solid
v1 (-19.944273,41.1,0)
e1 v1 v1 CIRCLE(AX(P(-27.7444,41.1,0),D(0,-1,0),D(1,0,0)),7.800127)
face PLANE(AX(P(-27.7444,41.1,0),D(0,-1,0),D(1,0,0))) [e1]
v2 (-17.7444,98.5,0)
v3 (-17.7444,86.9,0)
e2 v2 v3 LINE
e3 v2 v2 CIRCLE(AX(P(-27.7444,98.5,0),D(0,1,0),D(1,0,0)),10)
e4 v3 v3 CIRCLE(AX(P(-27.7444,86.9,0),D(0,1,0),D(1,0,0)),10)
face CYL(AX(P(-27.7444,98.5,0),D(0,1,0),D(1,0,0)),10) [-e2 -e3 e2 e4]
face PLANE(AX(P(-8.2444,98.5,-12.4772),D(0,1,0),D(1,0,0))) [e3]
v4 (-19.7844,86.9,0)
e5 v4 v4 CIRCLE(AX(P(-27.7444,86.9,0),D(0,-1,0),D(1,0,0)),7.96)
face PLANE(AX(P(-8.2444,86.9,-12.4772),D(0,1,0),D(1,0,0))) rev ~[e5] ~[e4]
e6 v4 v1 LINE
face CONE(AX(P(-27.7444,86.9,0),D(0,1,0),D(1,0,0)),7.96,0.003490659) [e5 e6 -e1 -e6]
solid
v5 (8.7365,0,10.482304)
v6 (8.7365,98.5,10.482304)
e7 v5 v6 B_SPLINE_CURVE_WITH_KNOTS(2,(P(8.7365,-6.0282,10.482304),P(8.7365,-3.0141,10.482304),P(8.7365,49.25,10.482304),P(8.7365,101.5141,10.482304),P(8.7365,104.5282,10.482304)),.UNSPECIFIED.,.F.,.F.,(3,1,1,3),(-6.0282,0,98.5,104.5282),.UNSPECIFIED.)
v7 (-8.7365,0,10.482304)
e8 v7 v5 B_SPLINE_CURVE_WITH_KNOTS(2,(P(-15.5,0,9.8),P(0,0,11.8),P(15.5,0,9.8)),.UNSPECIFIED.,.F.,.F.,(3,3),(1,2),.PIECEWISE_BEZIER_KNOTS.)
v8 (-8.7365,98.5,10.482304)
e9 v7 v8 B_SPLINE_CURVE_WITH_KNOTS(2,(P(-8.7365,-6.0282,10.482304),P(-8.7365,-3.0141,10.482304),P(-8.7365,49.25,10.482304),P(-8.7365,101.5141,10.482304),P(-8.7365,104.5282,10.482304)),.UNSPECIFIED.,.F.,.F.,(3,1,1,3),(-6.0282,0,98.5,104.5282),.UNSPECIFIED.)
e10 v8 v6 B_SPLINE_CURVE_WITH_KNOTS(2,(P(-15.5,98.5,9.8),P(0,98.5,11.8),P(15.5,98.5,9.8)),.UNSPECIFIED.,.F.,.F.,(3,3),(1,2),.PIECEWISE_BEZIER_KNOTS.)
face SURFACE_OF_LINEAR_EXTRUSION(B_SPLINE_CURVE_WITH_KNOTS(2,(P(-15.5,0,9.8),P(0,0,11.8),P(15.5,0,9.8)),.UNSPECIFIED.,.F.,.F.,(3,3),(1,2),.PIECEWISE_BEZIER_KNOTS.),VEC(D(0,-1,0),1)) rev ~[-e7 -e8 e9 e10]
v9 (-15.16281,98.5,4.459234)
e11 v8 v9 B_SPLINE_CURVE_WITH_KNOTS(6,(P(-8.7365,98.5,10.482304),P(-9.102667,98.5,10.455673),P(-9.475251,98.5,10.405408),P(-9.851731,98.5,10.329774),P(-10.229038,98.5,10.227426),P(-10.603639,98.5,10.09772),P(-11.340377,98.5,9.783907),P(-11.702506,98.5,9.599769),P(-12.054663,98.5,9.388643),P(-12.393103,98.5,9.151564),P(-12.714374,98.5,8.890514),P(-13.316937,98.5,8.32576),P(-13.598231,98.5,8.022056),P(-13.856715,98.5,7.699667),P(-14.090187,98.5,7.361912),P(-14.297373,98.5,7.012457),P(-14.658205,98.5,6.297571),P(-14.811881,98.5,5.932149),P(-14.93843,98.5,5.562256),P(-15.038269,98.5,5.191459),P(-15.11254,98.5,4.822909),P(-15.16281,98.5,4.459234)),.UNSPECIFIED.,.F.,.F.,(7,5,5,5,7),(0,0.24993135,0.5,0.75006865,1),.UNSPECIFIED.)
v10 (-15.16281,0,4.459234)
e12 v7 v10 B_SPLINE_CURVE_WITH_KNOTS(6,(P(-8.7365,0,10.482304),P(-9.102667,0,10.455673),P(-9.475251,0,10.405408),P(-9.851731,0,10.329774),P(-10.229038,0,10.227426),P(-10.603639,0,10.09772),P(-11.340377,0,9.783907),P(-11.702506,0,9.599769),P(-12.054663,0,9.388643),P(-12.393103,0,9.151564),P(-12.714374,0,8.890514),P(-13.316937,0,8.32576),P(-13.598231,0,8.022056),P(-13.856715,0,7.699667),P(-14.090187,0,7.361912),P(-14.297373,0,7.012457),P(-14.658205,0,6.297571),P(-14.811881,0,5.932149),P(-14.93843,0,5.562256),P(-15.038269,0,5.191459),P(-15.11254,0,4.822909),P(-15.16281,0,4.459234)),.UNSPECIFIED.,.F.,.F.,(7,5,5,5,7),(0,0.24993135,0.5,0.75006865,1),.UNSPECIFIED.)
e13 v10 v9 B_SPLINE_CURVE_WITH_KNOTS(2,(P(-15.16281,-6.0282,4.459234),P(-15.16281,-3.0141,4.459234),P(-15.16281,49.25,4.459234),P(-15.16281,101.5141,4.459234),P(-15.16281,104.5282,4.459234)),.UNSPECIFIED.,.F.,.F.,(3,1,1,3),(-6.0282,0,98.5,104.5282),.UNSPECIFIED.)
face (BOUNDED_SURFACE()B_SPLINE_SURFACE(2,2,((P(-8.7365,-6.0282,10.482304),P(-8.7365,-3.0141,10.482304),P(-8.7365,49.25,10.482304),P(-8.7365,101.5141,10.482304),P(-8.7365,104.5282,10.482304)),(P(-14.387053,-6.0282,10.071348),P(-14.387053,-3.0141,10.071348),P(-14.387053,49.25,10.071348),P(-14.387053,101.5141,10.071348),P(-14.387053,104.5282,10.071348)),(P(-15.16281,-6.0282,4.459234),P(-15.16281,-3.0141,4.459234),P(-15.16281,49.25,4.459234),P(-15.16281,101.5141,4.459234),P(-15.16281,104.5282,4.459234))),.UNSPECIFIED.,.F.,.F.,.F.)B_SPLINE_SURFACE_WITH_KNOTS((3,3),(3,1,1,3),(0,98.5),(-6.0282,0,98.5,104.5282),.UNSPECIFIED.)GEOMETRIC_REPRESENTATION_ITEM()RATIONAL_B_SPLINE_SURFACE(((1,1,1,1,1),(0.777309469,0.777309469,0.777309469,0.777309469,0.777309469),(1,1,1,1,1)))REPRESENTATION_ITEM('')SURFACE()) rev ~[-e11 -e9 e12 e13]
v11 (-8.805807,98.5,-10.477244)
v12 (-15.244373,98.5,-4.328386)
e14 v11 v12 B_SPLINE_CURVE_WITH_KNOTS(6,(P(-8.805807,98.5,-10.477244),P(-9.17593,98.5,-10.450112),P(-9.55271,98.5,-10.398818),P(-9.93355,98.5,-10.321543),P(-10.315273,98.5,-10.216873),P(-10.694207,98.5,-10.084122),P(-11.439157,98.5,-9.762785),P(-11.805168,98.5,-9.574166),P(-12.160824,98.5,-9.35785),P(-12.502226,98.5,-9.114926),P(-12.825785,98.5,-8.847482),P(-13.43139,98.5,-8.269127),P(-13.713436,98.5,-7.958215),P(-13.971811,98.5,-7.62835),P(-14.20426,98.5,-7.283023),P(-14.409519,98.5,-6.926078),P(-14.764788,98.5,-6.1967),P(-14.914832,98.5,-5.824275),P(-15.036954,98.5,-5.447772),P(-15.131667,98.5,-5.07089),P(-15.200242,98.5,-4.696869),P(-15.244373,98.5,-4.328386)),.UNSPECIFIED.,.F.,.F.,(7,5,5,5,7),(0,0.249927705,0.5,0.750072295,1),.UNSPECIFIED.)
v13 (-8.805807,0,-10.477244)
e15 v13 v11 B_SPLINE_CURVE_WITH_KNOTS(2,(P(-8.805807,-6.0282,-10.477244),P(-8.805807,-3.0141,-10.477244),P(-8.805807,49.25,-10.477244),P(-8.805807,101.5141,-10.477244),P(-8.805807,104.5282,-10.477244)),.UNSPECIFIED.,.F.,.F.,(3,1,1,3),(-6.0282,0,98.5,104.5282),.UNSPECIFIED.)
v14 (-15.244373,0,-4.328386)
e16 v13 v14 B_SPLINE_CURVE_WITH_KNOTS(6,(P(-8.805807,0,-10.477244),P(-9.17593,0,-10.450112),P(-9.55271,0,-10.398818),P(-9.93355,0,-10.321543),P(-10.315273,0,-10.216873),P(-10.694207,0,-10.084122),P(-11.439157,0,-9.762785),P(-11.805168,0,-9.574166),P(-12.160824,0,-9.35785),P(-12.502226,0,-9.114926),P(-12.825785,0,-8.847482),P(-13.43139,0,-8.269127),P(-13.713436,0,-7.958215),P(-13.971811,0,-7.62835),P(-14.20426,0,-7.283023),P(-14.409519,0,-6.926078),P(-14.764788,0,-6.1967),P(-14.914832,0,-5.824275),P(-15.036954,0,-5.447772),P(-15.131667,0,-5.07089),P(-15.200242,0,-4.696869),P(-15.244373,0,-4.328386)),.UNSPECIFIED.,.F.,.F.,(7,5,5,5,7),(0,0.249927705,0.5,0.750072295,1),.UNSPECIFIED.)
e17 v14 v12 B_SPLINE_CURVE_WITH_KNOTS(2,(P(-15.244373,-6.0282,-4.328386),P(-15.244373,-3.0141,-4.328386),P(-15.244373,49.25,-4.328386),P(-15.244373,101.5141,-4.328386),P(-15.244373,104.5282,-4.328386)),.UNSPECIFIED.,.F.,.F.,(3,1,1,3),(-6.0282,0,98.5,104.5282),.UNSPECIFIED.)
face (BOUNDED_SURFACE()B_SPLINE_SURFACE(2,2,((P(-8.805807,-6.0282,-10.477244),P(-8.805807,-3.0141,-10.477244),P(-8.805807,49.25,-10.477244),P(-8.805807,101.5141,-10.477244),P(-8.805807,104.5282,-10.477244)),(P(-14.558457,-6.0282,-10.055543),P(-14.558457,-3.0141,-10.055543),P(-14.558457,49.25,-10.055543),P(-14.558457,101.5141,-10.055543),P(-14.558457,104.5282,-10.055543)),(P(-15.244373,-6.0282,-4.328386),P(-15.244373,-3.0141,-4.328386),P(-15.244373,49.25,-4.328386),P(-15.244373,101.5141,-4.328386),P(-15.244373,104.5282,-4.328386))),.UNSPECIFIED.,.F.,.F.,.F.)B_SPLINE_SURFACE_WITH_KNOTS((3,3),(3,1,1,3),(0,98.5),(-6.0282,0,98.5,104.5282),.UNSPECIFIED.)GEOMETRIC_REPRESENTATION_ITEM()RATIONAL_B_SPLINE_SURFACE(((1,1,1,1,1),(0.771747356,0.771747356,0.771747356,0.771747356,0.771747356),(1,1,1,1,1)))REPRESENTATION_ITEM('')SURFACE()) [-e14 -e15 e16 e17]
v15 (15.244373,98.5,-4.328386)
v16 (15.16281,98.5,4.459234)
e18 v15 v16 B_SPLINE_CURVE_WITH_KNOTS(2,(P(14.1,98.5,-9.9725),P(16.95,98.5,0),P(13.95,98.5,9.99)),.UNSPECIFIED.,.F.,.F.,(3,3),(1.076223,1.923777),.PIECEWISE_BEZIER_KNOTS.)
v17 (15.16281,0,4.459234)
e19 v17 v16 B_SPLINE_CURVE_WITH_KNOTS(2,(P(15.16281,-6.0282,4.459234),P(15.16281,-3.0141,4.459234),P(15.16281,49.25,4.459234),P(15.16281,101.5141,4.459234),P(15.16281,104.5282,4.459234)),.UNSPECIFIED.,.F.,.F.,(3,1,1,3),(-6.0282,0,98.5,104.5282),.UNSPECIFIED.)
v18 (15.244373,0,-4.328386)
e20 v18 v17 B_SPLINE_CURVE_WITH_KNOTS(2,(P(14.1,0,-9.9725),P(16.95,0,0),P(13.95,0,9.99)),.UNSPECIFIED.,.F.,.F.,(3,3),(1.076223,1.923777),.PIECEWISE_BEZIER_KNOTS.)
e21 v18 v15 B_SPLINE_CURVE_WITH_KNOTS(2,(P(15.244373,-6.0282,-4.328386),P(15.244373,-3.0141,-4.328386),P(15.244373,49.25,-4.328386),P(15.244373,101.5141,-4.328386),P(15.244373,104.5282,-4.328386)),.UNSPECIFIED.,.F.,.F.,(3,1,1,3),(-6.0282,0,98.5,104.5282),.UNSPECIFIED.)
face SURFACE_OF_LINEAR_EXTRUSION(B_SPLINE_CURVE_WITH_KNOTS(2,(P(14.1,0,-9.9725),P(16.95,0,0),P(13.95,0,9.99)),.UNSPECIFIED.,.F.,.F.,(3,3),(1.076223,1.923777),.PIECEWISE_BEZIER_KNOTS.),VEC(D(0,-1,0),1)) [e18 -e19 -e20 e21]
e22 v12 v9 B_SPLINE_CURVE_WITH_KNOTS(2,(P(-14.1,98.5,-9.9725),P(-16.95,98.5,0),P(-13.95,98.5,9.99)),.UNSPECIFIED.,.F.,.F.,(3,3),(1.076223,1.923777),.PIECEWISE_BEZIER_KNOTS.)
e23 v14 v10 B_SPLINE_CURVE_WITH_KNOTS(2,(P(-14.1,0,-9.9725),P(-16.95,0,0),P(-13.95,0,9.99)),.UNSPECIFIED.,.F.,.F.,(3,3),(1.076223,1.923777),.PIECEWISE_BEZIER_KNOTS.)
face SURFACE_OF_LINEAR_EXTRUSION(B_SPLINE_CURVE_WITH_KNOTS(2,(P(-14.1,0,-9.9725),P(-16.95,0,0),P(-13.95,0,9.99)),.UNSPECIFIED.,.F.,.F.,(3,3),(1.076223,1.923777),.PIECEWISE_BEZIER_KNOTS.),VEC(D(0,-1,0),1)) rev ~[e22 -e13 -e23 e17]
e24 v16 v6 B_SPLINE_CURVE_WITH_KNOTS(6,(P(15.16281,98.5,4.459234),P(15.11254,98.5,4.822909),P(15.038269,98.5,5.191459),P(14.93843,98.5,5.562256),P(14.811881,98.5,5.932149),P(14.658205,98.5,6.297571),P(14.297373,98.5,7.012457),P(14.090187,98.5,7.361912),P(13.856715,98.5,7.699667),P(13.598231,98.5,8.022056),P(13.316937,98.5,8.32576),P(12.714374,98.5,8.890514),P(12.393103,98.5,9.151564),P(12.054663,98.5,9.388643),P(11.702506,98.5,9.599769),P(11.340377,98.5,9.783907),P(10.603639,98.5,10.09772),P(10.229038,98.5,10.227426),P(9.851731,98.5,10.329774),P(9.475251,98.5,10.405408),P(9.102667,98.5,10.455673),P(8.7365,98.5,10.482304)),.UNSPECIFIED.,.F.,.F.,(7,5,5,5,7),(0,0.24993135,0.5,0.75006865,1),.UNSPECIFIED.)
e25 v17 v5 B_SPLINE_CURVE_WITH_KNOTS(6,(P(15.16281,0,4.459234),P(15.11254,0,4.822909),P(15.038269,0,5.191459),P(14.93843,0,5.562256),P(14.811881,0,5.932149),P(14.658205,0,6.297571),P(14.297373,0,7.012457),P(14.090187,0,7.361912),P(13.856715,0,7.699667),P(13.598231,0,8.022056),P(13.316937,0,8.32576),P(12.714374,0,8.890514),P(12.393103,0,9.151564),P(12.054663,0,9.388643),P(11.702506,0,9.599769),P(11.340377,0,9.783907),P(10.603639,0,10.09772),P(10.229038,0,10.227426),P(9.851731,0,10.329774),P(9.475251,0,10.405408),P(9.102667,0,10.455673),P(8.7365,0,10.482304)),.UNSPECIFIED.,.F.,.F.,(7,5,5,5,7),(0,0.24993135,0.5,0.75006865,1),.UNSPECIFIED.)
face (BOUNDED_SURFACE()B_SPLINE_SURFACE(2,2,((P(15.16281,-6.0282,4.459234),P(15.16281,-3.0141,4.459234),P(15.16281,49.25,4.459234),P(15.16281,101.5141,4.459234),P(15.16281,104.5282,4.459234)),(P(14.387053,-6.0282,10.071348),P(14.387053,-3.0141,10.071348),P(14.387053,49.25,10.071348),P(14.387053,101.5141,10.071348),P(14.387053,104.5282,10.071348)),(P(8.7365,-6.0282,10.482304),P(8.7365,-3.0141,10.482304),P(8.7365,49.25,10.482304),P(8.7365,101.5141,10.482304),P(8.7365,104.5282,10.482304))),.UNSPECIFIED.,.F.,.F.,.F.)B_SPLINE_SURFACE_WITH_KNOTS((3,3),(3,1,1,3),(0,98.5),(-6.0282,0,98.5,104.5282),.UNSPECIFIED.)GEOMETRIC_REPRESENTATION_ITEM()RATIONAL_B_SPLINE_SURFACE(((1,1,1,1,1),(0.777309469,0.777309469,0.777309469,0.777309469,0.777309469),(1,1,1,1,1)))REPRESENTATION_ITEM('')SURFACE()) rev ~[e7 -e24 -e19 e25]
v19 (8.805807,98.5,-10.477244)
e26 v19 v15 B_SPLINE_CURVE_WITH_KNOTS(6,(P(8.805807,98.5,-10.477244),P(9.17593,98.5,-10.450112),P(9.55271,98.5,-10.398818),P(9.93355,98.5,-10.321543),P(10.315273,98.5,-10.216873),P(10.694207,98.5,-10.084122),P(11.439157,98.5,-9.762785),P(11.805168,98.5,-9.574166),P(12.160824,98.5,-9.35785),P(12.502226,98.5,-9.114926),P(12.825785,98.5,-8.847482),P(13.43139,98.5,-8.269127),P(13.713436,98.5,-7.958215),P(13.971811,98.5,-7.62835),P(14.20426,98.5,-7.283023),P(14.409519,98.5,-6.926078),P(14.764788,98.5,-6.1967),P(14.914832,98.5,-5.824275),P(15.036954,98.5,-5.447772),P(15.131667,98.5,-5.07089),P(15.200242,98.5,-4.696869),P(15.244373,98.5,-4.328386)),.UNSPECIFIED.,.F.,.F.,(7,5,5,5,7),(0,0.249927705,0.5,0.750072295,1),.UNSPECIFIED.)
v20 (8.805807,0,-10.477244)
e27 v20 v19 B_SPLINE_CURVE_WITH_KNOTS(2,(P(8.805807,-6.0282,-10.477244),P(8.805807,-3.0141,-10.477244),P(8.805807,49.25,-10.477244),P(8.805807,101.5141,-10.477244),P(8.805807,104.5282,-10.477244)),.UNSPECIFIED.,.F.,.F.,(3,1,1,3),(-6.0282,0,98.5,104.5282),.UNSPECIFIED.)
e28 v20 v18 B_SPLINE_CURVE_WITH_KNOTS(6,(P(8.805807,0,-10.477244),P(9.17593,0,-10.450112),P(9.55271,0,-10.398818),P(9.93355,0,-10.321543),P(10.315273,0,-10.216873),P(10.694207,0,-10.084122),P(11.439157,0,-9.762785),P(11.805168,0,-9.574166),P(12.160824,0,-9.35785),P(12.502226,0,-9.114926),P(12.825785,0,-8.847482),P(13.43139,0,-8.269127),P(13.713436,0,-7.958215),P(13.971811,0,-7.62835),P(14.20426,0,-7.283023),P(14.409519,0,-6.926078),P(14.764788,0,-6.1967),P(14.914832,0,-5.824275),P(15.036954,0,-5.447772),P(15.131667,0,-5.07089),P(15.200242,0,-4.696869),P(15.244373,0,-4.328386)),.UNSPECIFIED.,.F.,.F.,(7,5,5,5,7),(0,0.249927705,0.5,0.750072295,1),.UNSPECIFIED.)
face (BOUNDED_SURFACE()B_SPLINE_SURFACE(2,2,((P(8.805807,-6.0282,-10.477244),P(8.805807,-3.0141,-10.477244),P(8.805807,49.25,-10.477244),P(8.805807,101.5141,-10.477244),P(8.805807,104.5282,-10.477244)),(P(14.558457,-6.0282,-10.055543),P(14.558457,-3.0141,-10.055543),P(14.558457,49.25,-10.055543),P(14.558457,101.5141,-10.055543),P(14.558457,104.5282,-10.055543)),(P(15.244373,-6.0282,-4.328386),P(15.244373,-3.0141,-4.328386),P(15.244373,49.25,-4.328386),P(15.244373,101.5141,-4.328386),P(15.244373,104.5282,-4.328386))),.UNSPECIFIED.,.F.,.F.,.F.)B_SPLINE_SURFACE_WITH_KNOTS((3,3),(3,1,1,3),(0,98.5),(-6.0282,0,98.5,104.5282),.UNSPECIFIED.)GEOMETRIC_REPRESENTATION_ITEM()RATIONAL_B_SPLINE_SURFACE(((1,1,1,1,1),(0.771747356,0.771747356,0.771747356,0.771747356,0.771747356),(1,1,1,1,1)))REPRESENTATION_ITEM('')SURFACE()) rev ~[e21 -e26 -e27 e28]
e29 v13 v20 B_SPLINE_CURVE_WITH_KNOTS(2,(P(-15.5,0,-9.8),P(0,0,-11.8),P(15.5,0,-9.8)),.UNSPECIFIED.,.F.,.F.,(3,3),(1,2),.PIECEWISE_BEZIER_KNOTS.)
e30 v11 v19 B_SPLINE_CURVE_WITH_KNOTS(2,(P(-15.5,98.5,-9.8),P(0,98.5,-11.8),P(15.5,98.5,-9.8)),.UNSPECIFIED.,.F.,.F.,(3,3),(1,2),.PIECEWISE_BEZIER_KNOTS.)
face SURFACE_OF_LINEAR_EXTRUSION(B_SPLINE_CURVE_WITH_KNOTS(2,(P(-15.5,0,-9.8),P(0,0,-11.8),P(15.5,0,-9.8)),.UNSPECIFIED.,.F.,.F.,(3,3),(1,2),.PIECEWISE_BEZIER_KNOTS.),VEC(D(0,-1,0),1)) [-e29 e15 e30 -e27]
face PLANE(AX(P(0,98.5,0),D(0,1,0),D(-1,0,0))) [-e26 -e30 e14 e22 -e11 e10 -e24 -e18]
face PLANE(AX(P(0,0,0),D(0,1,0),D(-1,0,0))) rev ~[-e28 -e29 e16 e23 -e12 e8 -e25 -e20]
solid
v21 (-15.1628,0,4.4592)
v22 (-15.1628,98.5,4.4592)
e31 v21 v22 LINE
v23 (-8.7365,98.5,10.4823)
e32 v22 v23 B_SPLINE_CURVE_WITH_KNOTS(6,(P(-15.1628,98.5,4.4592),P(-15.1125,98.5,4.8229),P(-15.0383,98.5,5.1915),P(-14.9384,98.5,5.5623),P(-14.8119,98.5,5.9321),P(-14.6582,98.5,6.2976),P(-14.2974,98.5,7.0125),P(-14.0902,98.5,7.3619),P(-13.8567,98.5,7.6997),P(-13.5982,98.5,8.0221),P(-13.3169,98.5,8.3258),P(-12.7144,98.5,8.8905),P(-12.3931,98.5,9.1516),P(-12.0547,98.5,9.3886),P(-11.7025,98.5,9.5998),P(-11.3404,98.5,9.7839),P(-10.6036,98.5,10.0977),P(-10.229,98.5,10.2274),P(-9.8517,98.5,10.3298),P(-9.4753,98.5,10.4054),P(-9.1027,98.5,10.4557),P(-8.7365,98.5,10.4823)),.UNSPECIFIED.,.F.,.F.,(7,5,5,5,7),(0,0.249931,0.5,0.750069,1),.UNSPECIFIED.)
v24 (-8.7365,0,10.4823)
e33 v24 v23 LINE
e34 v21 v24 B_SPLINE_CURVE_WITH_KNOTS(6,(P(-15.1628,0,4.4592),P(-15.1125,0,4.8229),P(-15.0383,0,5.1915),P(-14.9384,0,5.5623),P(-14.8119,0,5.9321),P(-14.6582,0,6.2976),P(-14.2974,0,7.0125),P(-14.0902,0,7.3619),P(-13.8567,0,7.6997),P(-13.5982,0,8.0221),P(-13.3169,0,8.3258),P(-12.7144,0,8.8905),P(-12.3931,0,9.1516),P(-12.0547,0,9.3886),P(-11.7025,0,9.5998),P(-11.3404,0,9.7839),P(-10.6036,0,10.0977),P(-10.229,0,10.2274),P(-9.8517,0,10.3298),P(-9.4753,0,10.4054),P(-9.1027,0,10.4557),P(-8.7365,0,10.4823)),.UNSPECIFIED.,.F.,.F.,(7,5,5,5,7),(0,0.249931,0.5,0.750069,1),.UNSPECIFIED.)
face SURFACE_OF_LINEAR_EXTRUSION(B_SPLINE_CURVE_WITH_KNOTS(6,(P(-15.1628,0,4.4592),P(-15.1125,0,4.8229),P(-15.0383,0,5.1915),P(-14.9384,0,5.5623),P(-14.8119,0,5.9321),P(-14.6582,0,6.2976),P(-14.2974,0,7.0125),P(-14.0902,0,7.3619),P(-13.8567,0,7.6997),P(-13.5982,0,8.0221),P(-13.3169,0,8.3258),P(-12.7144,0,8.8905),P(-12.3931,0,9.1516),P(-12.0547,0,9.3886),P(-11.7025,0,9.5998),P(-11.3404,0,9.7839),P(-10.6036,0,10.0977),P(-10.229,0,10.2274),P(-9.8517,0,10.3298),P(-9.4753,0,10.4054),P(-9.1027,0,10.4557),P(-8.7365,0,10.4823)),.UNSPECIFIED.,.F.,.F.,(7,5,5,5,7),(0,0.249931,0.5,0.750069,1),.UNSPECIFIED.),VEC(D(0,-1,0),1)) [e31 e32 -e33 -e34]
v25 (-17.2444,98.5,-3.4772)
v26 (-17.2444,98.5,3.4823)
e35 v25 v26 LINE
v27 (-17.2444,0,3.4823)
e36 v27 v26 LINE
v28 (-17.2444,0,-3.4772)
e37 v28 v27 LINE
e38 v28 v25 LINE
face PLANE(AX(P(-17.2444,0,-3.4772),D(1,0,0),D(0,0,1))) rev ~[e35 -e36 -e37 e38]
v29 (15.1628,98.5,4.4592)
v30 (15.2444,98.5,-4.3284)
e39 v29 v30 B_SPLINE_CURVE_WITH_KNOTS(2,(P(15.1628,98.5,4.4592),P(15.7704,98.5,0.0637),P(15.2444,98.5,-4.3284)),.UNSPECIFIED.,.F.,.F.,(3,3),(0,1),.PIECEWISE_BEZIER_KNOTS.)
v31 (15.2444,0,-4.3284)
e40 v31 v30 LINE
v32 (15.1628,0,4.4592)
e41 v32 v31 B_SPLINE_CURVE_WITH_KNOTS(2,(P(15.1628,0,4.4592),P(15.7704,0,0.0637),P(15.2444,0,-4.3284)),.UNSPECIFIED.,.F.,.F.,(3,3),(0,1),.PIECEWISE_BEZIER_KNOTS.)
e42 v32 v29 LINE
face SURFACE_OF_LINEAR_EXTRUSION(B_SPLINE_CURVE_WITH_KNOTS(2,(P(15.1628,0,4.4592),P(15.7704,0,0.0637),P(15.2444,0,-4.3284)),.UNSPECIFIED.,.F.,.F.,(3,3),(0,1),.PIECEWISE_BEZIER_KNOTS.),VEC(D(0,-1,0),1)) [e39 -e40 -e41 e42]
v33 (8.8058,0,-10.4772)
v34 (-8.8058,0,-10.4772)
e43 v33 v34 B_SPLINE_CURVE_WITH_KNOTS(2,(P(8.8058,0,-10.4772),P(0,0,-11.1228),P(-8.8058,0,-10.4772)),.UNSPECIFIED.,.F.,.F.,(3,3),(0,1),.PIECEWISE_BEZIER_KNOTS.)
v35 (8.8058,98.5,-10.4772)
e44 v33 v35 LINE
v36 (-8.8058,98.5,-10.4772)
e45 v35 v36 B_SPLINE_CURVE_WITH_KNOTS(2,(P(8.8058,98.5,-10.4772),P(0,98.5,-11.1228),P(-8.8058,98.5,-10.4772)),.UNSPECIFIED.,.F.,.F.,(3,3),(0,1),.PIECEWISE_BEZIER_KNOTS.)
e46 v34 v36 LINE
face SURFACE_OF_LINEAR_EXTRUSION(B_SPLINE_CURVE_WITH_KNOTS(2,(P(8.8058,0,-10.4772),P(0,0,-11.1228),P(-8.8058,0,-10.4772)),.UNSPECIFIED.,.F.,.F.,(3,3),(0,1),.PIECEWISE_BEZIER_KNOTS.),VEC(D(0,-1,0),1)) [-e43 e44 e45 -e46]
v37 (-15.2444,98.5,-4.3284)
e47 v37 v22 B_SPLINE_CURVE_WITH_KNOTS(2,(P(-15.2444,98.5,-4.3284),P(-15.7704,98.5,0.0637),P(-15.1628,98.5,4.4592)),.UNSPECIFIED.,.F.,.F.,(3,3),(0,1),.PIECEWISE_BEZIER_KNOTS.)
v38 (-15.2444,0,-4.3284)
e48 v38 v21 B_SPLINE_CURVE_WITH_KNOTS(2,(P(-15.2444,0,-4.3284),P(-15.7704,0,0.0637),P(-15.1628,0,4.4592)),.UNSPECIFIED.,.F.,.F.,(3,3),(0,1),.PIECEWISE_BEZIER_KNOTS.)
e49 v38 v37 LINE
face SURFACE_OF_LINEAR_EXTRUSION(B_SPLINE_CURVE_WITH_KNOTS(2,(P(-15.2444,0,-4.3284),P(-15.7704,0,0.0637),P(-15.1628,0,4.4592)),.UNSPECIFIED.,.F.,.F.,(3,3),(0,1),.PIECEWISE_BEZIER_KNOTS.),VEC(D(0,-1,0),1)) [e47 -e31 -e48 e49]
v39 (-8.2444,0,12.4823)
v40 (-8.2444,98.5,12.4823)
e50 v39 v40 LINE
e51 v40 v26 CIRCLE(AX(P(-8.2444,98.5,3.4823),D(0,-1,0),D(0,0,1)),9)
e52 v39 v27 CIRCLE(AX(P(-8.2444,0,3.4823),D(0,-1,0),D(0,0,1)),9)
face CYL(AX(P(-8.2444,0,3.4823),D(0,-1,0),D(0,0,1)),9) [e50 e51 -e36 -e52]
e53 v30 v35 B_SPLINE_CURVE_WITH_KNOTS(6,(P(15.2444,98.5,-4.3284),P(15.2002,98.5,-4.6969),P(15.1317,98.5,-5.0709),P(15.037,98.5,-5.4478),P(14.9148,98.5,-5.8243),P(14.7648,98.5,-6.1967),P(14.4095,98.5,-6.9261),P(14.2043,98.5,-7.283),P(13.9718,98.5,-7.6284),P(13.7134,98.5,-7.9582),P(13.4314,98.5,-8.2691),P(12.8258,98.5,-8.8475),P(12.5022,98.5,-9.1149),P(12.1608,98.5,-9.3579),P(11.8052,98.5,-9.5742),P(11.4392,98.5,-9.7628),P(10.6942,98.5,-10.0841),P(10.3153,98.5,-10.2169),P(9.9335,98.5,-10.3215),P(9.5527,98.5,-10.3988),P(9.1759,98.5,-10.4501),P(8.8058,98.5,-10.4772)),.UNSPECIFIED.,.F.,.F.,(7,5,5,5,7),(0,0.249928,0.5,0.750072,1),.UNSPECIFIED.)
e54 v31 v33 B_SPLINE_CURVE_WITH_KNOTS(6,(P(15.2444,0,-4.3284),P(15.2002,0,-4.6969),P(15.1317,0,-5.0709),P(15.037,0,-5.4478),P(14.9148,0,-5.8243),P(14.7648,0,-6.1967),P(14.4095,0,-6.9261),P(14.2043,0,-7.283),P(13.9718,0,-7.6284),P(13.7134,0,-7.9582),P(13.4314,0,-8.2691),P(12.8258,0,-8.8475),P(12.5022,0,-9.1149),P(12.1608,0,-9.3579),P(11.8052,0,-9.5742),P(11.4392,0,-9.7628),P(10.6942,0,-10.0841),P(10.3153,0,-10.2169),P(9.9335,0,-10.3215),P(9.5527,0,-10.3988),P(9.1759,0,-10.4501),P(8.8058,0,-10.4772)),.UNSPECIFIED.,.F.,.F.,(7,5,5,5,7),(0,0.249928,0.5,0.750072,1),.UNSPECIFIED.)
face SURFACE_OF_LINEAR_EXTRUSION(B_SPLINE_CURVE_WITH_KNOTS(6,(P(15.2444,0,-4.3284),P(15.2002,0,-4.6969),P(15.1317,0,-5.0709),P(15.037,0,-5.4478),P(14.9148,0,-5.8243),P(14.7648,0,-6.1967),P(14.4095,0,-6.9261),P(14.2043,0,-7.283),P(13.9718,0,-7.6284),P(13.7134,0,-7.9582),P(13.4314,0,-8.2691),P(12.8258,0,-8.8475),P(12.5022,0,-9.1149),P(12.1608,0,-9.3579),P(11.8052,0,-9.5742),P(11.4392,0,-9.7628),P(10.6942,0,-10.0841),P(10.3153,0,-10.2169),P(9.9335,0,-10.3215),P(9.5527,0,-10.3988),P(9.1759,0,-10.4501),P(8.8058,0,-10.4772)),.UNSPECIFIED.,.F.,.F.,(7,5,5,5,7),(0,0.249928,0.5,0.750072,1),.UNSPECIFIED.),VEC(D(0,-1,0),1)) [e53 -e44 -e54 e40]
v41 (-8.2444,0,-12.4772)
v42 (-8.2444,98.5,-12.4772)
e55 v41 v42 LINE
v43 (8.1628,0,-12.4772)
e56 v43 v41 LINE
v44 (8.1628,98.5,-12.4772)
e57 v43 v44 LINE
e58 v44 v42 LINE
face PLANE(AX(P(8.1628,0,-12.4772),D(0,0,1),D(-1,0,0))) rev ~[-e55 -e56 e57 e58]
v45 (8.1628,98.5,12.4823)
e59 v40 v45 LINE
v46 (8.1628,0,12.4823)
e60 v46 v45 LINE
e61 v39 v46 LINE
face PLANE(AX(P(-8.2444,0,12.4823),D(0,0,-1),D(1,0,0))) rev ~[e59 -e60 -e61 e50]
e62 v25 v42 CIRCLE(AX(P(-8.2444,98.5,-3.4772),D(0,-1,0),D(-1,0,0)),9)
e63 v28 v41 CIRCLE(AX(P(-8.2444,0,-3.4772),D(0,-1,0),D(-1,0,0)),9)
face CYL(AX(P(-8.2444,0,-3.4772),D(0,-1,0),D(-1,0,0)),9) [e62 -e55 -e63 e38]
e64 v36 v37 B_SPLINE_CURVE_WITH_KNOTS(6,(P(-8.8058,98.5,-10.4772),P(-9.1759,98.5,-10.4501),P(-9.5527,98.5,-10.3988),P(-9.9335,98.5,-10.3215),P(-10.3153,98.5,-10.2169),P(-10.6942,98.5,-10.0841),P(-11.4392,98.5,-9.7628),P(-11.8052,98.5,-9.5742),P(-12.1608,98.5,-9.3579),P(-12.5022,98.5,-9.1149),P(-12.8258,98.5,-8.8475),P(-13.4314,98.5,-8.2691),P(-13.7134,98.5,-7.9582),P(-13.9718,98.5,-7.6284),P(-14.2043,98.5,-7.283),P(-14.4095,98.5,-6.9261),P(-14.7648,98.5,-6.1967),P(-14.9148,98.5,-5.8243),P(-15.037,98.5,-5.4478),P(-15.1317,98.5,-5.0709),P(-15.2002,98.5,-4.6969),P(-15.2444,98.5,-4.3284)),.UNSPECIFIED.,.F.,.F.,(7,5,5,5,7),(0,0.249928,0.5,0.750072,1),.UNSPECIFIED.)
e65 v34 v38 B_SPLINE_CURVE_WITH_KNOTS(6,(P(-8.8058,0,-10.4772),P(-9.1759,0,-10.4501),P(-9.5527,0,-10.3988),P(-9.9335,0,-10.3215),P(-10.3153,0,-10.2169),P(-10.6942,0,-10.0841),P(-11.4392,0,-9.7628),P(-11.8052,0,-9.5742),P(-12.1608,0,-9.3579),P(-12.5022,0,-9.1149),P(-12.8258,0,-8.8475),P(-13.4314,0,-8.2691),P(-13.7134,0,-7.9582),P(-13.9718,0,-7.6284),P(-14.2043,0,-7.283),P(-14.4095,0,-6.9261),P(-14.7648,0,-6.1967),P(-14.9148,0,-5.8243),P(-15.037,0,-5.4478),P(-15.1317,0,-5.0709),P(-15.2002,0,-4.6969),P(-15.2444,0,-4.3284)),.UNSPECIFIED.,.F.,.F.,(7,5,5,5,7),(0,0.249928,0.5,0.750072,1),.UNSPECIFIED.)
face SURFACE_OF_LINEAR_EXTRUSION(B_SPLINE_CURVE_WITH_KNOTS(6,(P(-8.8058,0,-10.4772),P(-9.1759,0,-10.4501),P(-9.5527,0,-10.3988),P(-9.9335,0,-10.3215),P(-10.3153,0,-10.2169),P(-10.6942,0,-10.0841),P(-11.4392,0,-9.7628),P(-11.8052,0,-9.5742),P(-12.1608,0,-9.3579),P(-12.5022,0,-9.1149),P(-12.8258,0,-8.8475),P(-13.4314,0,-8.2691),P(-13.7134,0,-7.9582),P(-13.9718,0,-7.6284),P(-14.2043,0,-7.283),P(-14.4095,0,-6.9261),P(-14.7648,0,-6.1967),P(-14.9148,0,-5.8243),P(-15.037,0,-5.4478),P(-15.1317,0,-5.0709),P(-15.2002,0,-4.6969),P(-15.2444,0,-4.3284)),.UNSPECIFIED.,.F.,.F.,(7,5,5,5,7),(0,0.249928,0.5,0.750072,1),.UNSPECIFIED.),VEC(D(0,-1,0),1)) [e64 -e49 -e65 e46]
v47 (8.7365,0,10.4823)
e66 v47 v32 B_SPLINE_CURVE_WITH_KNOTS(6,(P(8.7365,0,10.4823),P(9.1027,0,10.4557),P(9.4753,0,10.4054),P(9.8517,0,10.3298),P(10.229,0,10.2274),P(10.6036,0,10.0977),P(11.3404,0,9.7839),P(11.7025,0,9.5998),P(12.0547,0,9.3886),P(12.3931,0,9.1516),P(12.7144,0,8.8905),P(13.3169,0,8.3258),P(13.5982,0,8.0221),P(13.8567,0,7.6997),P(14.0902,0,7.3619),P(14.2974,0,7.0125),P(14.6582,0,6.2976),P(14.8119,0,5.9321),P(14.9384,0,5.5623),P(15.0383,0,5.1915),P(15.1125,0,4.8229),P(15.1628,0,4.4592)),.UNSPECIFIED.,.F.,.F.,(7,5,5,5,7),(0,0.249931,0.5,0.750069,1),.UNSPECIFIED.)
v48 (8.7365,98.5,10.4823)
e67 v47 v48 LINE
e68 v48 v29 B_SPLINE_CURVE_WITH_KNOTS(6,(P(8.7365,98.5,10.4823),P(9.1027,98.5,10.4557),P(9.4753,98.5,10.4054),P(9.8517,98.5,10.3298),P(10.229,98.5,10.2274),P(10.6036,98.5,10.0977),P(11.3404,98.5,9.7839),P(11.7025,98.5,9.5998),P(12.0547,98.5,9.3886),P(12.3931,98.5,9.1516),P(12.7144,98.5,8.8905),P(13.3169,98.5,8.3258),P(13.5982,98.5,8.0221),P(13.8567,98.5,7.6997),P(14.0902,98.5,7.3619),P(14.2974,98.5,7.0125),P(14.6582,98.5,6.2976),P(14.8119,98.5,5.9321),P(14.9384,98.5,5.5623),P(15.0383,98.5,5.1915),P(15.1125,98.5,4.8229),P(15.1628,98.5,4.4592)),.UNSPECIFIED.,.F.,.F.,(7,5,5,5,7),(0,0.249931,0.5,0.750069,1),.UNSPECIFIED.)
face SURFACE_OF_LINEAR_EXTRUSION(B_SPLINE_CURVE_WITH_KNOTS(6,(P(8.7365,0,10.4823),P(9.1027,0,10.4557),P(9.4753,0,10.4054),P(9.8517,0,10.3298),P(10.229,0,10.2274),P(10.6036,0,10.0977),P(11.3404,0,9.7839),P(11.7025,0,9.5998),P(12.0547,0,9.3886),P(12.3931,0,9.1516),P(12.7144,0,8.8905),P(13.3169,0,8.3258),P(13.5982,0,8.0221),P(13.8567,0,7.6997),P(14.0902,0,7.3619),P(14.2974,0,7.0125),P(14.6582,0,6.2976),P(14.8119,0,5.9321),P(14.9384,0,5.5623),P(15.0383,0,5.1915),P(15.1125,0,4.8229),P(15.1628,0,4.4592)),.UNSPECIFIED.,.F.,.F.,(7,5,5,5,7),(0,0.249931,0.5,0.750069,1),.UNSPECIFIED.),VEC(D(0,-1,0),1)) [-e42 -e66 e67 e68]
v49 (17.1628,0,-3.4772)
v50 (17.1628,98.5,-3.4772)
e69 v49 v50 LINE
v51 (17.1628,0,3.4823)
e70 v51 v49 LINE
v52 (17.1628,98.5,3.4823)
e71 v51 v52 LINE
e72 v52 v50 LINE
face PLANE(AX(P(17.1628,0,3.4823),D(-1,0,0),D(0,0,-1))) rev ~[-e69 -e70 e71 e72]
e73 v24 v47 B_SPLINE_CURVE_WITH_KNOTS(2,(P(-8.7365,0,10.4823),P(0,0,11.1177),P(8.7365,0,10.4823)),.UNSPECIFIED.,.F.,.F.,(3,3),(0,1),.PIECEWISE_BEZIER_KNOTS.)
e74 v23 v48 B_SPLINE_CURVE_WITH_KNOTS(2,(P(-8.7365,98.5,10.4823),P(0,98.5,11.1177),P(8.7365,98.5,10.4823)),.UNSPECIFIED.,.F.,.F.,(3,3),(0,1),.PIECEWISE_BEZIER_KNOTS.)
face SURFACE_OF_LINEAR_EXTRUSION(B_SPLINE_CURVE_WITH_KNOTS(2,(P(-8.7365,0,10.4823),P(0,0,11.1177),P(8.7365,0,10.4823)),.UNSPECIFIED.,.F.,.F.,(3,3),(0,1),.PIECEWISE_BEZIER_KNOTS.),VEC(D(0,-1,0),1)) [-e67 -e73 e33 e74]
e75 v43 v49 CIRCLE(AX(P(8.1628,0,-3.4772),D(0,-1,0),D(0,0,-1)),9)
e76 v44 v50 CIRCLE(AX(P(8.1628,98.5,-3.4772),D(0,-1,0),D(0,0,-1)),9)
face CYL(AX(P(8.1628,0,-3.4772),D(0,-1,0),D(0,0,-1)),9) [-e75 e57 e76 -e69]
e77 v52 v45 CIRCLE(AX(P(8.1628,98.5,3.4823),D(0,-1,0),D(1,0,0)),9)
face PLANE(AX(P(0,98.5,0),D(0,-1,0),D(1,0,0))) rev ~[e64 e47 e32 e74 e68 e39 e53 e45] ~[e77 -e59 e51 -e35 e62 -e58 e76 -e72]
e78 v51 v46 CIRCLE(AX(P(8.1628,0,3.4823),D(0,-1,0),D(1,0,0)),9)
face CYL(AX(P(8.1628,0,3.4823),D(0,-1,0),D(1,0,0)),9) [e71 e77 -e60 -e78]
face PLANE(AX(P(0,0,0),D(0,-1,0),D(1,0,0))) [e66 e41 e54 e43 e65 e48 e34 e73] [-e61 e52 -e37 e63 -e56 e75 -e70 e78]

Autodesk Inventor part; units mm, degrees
ref_plane "YZ Plane" through (0, 0, 0) normal (1, 0, 0) x (0, 1, 0)
ref_plane "XZ Plane" through (0, 0, 0) normal (0, 1, 0) x (-1, 0, 0)
ref_plane "XY Plane" through (0, 0, 0) normal (0, 0, 1) x (1, 0, 0)
sketch "Sketch1" plane through (0, 0, 0) normal (0, 1, 0) x (-1, 0, 0)
  line L0 (15.5, -10.8) -> (-15.5, -10.8) construction
  line L1 (-15.5, -10.8) -> (-15.5, 10.8) construction
  line L2 (-15.5, 10.8) -> (15.5, 10.8) construction
  line L3 (15.5, 10.8) -> (15.5, -10.8) construction
  line L4 (15.5, -9.8) -> (0, -11.8) construction
  line L5 (0, -11.8) -> (-15.5, -9.8) construction
  spline S0 degree 2 poles (15.5, -9.8) (0, -11.8) (-15.5, -9.8) knots 1 1 1 2 2 2
  line L6 (15.5, 9.8) -> (0, 11.8) construction
  line L7 (0, 11.8) -> (-15.5, 9.8) construction
  spline S1 degree 2 poles (15.5, 9.8) (0, 11.8) (-15.5, 9.8) knots 1 1 1 2 2 2
  line L8 (-15.5, -9.8) -> (-15.5, 9.8)
  line L9 (15.5, 9.8) -> (15.5, -9.8)
  line L10 (13.5, -10.8) -> (13.3899, -12.4573) construction
  line L11 (13.3858, 11.8689) -> (13.5, 10.8) construction
  spline S2 degree 2 poles (13.95, 9.99) (13.3858, 11.8689) (13.5, 10.8) knots 0 0 0 1 1 1 construction
  spline S3 degree 2 poles (13.5, -10.8) (13.3899, -12.4573) (14.1, -9.9725) knots 0 0 0 1 1 1 construction
  line L12 (13.3899, -12.4573) -> (14.1, -9.9725) construction
  line L13 (14.1, -9.9725) -> (16.95, 0) construction
  spline S4 degree 2 poles (14.1, -9.9725) (16.95, 0) (13.95, 9.99) knots 1.076223 1.076223 1.076223 1.923777 1.923777 1.923777
  line L14 (16.95, 0) -> (13.95, 9.99) construction
  line L15 (13.95, 9.99) -> (13.3858, 11.8689) construction
  line L16 (0, 3.4411) -> (0, -4.0542)
  line L17 (-14.1, -9.9725) -> (-16.95, 0) construction
  spline S5 degree 2 poles (-14.1, -9.9725) (-16.95, 0) (-13.95, 9.99) knots 1.076223 1.076223 1.076223 1.923777 1.923777 1.923777
  line L18 (-16.95, 0) -> (-13.95, 9.99) construction
  point P0 (0, 0)
  point P1 (-15.977, 0)
  point P2 (-15.977, 0)
  point P3 (15.5, 0)
  point P4 (-15.5, 0)
  point P5 (15.5, 0)
  point P6 (-15.5, -1.3514)
  point P7 (-14.1, -9.9725)
  point P8 (15.5, -1.3514)
  point P9 (15.5, 1.0529)
  point P10 (-13.95, 9.99)
  point P11 (-15.5, 1.0529)
  dimension "d0" = 31
  dimension "d1" = 15.5
  dimension "d2" = 21.6
  dimension "d3" = 10.8
  dimension "d6" = 1
  dimension "d7" = 15.5
  dimension "d8" = 2
  dimension "d10" = 2
  dimension "d13" = 1.55
  dimension "d14" = 1.4
  dimension "d15" = 3
extrude "Extrusion1" add sketch "Sketch1" along normal blind 98.5 contours S0 S5 S1 S4
fillet "Fillet1" radius 7 4 edges at (13.95, 49.25, 9.99) (-13.95, 49.25, 9.99) (14.1, 49.25, -9.9725) (-14.1, 49.25, -9.9725)
sketch "Sketch2" plane through (0, 0, 0) normal (0, -1, 0) x (1, 0, 0)
  spline S0 degree 6 poles (-8.8058, -10.4772) (-9.1759, -10.4501) (-9.5527, -10.3988) (-9.9335, -10.3215) (-10.3153, -10.2169) (-10.6942, -10.0841) (-11.4392, -9.7628) (-11.8052, -9.5742) (-12.1608, -9.3579) (-12.5022, -9.1149) (-12.8258, -8.8475) (-13.4314, -8.2691) (-13.7134, -7.9582) (-13.9718, -7.6284) (-14.2043, -7.283) (-14.4095, -6.9261) (-14.7648, -6.1967) (-14.9148, -5.8243) (-15.037, -5.4478) (-15.1317, -5.0709) (-15.2002, -4.6969) (-15.2444, -4.3284) knots 0 0 0 0 0 0 0 0.249928 0.249928 0.249928 0.249928 0.249928 0.5 0.5 0.5 0.5 0.5 0.750072 0.750072 0.750072 0.750072 0.750072 1 1 1 1 1 1 1 projected
  spline S1 degree 2 poles (8.8058, -10.4772) (0, -11.1228) (-8.8058, -10.4772) knots 0 0 0 1 1 1 projected
  spline S2 degree 6 poles (15.2444, -4.3284) (15.2002, -4.6969) (15.1317, -5.0709) (15.037, -5.4478) (14.9148, -5.8243) (14.7648, -6.1967) (14.4095, -6.9261) (14.2043, -7.283) (13.9718, -7.6284) (13.7134, -7.9582) (13.4314, -8.2691) (12.8258, -8.8475) (12.5022, -9.1149) (12.1608, -9.3579) (11.8052, -9.5742) (11.4392, -9.7628) (10.6942, -10.0841) (10.3153, -10.2169) (9.9335, -10.3215) (9.5527, -10.3988) (9.1759, -10.4501) (8.8058, -10.4772) knots 0 0 0 0 0 0 0 0.249928 0.249928 0.249928 0.249928 0.249928 0.5 0.5 0.5 0.5 0.5 0.750072 0.750072 0.750072 0.750072 0.750072 1 1 1 1 1 1 1 projected
  spline S3 degree 2 poles (15.1628, 4.4592) (15.7704, 0.0637) (15.2444, -4.3284) knots 0 0 0 1 1 1 projected
  spline S4 degree 6 poles (8.7365, 10.4823) (9.1027, 10.4557) (9.4753, 10.4054) (9.8517, 10.3298) (10.229, 10.2274) (10.6036, 10.0977) (11.3404, 9.7839) (11.7025, 9.5998) (12.0547, 9.3886) (12.3931, 9.1516) (12.7144, 8.8905) (13.3169, 8.3258) (13.5982, 8.0221) (13.8567, 7.6997) (14.0902, 7.3619) (14.2974, 7.0125) (14.6582, 6.2976) (14.8119, 5.9321) (14.9384, 5.5623) (15.0383, 5.1915) (15.1125, 4.8229) (15.1628, 4.4592) knots 0 0 0 0 0 0 0 0.249931 0.249931 0.249931 0.249931 0.249931 0.5 0.5 0.5 0.5 0.5 0.750069 0.750069 0.750069 0.750069 0.750069 1 1 1 1 1 1 1 projected
  spline S5 degree 2 poles (-8.7365, 10.4823) (0, 11.1177) (8.7365, 10.4823) knots 0 0 0 1 1 1 projected
  spline S6 degree 6 poles (-15.1628, 4.4592) (-15.1125, 4.8229) (-15.0383, 5.1915) (-14.9384, 5.5623) (-14.8119, 5.9321) (-14.6582, 6.2976) (-14.2974, 7.0125) (-14.0902, 7.3619) (-13.8567, 7.6997) (-13.5982, 8.0221) (-13.3169, 8.3258) (-12.7144, 8.8905) (-12.3931, 9.1516) (-12.0547, 9.3886) (-11.7025, 9.5998) (-11.3404, 9.7839) (-10.6036, 10.0977) (-10.229, 10.2274) (-9.8517, 10.3298) (-9.4753, 10.4054) (-9.1027, 10.4557) (-8.7365, 10.4823) knots 0 0 0 0 0 0 0 0.249931 0.249931 0.249931 0.249931 0.249931 0.5 0.5 0.5 0.5 0.5 0.750069 0.750069 0.750069 0.750069 0.750069 1 1 1 1 1 1 1 projected
  spline S7 degree 2 poles (-15.2444, -4.3284) (-15.7704, 0.0637) (-15.1628, 4.4592) knots 0 0 0 1 1 1 projected
  line L0 (-8.2444, 12.4823) -> (8.1628, 12.4823)
  line L1 (17.1628, 3.4823) -> (17.1628, -3.4772)
  line L2 (8.1628, -12.4772) -> (-8.2444, -12.4772)
  line L3 (-17.2444, -3.4772) -> (-17.2444, 3.4823)
  arc A0 (-8.2444, 12.4823) -> (-17.2444, 3.4823) centre (-8.2444, 3.4823) ccw
  arc A1 (17.1628, 3.4823) -> (8.1628, 12.4823) centre (8.1628, 3.4823) ccw
  arc A2 (8.1628, -12.4772) -> (17.1628, -3.4772) centre (8.1628, -3.4772) ccw
  arc A3 (-17.2444, -3.4772) -> (-8.2444, -12.4772) centre (-8.2444, -3.4772) ccw
  point P0 (0, 0)
  dimension "d17" = 2
  dimension "d18" = 2
  dimension "d19" = 2
  dimension "d20" = 2
  dimension "d21" = 9
extrude "Extrusion2" add sketch "Sketch2" against normal up to surface (98.5 mm away) separate body
sketch "Sketch3" plane through (-8.2444, 98.5, -12.4772) normal (0, 1, 0) x (1, 0, 0)
  circle A0 centre (-19.5, -12.4772) radius 10
  line L0 (-9, -15.9595) -> (-9, -9) projected
  point P0 (8.2444, -12.4772)
  dimension "d24" = 20
  dimension "d25" = 10.5
extrude "Extrusion3" add sketch "Sketch3" against normal blind 11.6 separate body
sketch "Sketch4" plane through (-27.7444, 86.9, 0) normal (0, -1, 0) x (1, 0, 0)
  circle A0 centre (0, 0) radius 7.96
  circle A1 centre (0, 0) radius 10 projected
  point P0 (27.7444, 0)
  dimension "d28" = 15.92
extrude "Extrusion4" add sketch "Sketch4" along normal blind 45.8 draft -0.2 contours A0 bodies 3
sketch "Sketch5" plane through (-27.7444, 41.1, 0) normal (0, -1, 0) x (1, 0, 0)
  circle A0 centre (0, 0) radius 7.8001 projected
  point P0 (27.7444, 0)
  dimension "d31" = 15.6003
equation "\"d1\" = 0.5 * d0"
equation "\"d3\" = 0.5 * d2"
equation "\"d7\" = d1"
equation "\"d19\" = d18"
equation "\"d20\" = d18"
properties part number "vape-tube-test-print"
